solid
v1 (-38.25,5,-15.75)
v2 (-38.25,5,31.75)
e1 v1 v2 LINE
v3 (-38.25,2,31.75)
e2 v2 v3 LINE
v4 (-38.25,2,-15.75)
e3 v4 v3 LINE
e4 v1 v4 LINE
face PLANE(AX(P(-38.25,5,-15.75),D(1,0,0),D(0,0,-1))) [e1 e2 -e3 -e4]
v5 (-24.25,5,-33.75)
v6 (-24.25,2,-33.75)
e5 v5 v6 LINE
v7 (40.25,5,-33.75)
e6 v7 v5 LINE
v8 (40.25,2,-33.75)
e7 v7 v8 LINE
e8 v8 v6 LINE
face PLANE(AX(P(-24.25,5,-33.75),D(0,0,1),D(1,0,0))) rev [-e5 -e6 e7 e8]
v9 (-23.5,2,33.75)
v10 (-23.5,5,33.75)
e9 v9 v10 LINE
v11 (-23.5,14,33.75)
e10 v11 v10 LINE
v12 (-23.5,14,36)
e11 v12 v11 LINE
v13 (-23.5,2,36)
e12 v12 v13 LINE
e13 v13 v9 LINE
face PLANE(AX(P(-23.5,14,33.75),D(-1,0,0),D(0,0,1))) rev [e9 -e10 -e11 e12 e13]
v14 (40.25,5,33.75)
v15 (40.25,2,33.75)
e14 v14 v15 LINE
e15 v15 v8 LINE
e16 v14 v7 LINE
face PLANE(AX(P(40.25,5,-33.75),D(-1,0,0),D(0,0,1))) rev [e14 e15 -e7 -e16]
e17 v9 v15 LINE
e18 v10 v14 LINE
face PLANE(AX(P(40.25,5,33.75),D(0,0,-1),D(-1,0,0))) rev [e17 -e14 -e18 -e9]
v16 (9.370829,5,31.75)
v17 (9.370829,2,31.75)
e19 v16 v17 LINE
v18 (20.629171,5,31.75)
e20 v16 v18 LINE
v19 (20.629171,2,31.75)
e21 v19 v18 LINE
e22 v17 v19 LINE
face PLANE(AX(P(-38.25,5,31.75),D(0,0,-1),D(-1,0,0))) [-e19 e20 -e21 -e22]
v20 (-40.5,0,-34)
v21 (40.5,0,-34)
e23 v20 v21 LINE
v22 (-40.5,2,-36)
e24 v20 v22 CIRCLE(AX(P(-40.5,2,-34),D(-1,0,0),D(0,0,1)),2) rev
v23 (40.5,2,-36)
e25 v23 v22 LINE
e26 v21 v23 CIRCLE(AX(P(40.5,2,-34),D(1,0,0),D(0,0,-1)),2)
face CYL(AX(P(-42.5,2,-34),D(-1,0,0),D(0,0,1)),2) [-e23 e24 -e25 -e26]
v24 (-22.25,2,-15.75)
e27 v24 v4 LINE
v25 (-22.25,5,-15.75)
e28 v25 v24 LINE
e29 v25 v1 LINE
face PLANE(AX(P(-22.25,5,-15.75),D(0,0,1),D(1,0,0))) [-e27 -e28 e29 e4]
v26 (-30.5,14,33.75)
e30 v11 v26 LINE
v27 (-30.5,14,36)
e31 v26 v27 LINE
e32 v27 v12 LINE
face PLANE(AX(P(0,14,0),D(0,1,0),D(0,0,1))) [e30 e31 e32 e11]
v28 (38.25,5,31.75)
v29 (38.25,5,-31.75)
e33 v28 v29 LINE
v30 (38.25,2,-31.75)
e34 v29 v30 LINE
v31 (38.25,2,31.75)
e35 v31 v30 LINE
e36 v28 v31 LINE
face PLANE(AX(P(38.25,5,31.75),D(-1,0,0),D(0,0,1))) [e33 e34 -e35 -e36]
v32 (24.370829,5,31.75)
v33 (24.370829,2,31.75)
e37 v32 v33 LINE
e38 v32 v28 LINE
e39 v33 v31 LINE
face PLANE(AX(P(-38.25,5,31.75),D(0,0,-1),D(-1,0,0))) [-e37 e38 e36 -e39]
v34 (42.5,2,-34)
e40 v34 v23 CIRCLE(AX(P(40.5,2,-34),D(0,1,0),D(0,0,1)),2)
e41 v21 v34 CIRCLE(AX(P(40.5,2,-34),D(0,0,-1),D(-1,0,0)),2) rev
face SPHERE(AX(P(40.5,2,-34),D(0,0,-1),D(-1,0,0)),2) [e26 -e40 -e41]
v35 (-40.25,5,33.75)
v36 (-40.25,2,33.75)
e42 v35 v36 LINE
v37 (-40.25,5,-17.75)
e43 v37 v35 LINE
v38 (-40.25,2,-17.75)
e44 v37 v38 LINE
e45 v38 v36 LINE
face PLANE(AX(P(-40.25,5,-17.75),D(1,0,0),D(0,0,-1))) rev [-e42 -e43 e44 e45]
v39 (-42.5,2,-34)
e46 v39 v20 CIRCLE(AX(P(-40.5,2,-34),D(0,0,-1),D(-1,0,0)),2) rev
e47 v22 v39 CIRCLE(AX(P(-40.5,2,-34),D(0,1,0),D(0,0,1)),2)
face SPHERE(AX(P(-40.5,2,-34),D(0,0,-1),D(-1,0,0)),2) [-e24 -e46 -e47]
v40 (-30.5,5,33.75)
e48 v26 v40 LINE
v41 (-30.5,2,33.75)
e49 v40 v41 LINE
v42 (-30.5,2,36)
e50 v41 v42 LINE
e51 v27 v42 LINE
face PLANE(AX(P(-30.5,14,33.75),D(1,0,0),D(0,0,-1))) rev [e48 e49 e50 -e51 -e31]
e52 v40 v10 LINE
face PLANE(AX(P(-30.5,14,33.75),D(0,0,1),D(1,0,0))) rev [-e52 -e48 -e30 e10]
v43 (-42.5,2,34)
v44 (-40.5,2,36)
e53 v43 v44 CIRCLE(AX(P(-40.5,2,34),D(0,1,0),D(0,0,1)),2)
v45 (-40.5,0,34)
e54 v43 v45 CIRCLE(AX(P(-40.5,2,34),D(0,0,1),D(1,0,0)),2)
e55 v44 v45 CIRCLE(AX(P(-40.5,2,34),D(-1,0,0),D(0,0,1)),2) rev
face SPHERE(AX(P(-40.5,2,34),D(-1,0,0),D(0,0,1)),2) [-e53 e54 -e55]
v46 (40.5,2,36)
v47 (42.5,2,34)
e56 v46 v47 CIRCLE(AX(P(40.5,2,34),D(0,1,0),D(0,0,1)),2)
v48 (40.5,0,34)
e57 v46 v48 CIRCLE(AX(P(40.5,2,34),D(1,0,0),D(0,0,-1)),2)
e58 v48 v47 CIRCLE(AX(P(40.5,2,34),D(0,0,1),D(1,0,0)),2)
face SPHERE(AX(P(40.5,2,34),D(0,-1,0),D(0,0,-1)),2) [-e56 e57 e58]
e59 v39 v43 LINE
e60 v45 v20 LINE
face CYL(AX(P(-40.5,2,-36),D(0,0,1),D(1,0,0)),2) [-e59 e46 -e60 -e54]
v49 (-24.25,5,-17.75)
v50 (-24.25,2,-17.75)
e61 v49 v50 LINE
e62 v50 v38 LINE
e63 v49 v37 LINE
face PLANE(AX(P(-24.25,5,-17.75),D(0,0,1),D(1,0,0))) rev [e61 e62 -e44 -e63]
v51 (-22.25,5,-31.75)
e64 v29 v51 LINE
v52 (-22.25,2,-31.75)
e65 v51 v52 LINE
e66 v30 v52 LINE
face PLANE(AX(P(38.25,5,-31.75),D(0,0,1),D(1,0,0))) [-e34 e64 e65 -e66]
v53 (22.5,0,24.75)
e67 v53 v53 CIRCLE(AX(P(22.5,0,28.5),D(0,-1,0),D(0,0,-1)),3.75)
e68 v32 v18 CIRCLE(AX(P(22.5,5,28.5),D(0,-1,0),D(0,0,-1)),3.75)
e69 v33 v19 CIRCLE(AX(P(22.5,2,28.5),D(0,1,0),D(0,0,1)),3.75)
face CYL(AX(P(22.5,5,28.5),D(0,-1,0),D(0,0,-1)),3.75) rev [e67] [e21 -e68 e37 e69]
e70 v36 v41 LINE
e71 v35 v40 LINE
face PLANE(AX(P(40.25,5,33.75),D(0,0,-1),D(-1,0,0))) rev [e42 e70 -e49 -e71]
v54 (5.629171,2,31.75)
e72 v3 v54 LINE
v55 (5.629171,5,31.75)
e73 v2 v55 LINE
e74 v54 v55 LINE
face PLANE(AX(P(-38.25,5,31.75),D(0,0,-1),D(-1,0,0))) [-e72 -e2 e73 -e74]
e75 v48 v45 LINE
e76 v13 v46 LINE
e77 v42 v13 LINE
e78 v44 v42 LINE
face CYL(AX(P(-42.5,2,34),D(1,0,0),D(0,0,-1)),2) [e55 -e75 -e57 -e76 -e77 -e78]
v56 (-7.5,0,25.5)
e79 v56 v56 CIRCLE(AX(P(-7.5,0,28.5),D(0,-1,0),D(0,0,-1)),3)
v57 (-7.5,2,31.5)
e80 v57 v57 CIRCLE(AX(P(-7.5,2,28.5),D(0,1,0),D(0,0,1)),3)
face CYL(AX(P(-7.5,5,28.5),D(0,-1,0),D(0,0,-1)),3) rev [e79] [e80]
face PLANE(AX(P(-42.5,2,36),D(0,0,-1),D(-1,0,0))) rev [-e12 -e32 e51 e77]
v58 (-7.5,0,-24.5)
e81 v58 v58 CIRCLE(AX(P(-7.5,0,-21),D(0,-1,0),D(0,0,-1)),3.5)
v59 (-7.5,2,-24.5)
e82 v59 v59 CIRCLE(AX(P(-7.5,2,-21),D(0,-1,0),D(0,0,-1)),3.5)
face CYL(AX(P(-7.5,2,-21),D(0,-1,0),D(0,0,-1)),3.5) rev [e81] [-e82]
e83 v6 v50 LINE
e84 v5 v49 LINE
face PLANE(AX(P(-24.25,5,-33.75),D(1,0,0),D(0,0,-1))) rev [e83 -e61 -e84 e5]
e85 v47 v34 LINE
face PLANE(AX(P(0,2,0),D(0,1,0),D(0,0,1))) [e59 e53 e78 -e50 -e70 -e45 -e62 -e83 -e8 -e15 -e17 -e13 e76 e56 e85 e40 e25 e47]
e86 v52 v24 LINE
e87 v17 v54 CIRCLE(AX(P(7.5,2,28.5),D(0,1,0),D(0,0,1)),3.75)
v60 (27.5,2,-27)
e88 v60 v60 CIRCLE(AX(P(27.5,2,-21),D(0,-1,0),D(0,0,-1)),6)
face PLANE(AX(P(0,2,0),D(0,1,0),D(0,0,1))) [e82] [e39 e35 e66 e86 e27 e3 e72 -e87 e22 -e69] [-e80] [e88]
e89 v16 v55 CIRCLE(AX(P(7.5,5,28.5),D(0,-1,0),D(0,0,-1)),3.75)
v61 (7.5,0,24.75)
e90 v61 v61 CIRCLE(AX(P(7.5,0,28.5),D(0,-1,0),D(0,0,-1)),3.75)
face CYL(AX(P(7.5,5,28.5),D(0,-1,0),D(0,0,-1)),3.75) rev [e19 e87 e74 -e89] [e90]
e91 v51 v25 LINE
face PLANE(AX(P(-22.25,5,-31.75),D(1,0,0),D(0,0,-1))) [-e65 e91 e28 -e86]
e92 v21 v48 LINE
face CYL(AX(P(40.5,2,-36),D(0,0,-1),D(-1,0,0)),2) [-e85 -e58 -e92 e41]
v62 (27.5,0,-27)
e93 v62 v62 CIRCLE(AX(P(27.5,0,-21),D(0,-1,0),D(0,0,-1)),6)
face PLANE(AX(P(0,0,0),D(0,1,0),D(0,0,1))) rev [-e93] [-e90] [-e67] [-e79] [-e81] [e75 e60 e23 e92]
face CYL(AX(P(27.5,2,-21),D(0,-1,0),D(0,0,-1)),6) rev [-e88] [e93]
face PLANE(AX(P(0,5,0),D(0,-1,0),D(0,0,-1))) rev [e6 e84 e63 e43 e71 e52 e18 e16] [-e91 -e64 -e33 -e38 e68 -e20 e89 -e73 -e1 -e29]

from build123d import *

# Parameters (mm, degrees)
ESQUISSE1_W             = 85
ESQUISSE1_H             = 72
BOSS_EXTRU_1_DEPTH      = 2
BOSS_EXTRU_2_DEPTH      = 3
ESQUISSE3_R             = 3.75
ESQUISSE3_R_2           = 3
ENL_V_MAT_EXTRU_1_DEPTH = 56.921820428
ESQUISSE4_R             = 6
ESQUISSE4_R_2           = 3.5
ENL_V_MAT_EXTRU_2_DEPTH = 2
ESQUISSE8_W             = 7
ESQUISSE8_H             = 2.25
BOSS_EXTRU_4_DEPTH      = 12
CONG_4_R                = 2


with BuildPart() as part:
    # Esquisse1 → Boss.-Extru.1 (new body)
    with BuildSketch(Plane(origin=(0, 0, 0), x_dir=(1, 0, 0), z_dir=(0, 1, 0))):
        Rectangle(ESQUISSE1_W, ESQUISSE1_H)
    extrude(amount=BOSS_EXTRU_1_DEPTH)

    # Esquisse2 → Boss.-Extru.2 (add)
    with BuildSketch(Plane(origin=(0, 2, 0), x_dir=(1, 0, 0), z_dir=(0, 1, 0))):
        Polygon((40.25, -33.75), (-40.25, -33.75), (-40.25, 17.75), (-24.25, 17.75), (-24.25, 33.75), (40.25, 33.75), align=None)
        Polygon((-38.25, -31.75), (38.25, -31.75), (38.25, 31.75), (-22.25, 31.75), (-22.25, 15.75), (-38.25, 15.75), align=None, mode=Mode.SUBTRACT)
    extrude(amount=BOSS_EXTRU_2_DEPTH)

    # Esquisse3 → Enlèv. mat.-Extru.1 (cut, through all)
    with BuildSketch(Plane(origin=(0, 0, 0), x_dir=(-1, 0, 0), z_dir=(0, -1, 0))):
        with Locations(Location((-22.5, -28.5, 0), (0, 0, 90))):
            Circle(ESQUISSE3_R)
        with Locations(Location((-7.5, -28.5, 0), (0, 0, 90))):
            Circle(ESQUISSE3_R)
        with Locations(Location((7.5, -28.5, 0), (0, 0, 90))):
            Circle(ESQUISSE3_R_2)
    extrude(amount=-ENL_V_MAT_EXTRU_1_DEPTH, mode=Mode.SUBTRACT)

    # Esquisse4 → Enlèv. mat.-Extru.2 (cut)
    with BuildSketch(Plane(origin=(0, 0, 0), x_dir=(-1, 0, 0), z_dir=(0, -1, 0))):
        with Locations(Location((-27.5, 21, 0), (0, 0, 90))):
            Circle(ESQUISSE4_R)
        with Locations(Location((7.5, 21, 0), (0, 0, 90))):
            Circle(ESQUISSE4_R_2)
    extrude(amount=-ENL_V_MAT_EXTRU_2_DEPTH, mode=Mode.SUBTRACT)

    # Esquisse8 → Boss.-Extru.4 (add)
    with BuildSketch(Plane(origin=(0, 2, 0), x_dir=(1, 0, 0), z_dir=(0, 1, 0))):
        with Locations((-27, -34.875)):
            Rectangle(ESQUISSE8_W, ESQUISSE8_H)
    extrude(amount=BOSS_EXTRU_4_DEPTH)

    # Congé4
    cong_4_edges = [part.edges().sort_by_distance(p)[0] for p in [
        (0, 0, -36),
        (42.5, 0, 0),
        (0, 0, 36),
        (-42.5, 0, 0),
        (-42.5, 1, -36),
        (42.5, 1, -36),
        (42.5, 1, 36),
        (-42.5, 1, 36),
    ]]
    fillet(cong_4_edges, radius=CONG_4_R - 0.0001)  # a hair under: the kernel refuses the full size


solid = part.part
